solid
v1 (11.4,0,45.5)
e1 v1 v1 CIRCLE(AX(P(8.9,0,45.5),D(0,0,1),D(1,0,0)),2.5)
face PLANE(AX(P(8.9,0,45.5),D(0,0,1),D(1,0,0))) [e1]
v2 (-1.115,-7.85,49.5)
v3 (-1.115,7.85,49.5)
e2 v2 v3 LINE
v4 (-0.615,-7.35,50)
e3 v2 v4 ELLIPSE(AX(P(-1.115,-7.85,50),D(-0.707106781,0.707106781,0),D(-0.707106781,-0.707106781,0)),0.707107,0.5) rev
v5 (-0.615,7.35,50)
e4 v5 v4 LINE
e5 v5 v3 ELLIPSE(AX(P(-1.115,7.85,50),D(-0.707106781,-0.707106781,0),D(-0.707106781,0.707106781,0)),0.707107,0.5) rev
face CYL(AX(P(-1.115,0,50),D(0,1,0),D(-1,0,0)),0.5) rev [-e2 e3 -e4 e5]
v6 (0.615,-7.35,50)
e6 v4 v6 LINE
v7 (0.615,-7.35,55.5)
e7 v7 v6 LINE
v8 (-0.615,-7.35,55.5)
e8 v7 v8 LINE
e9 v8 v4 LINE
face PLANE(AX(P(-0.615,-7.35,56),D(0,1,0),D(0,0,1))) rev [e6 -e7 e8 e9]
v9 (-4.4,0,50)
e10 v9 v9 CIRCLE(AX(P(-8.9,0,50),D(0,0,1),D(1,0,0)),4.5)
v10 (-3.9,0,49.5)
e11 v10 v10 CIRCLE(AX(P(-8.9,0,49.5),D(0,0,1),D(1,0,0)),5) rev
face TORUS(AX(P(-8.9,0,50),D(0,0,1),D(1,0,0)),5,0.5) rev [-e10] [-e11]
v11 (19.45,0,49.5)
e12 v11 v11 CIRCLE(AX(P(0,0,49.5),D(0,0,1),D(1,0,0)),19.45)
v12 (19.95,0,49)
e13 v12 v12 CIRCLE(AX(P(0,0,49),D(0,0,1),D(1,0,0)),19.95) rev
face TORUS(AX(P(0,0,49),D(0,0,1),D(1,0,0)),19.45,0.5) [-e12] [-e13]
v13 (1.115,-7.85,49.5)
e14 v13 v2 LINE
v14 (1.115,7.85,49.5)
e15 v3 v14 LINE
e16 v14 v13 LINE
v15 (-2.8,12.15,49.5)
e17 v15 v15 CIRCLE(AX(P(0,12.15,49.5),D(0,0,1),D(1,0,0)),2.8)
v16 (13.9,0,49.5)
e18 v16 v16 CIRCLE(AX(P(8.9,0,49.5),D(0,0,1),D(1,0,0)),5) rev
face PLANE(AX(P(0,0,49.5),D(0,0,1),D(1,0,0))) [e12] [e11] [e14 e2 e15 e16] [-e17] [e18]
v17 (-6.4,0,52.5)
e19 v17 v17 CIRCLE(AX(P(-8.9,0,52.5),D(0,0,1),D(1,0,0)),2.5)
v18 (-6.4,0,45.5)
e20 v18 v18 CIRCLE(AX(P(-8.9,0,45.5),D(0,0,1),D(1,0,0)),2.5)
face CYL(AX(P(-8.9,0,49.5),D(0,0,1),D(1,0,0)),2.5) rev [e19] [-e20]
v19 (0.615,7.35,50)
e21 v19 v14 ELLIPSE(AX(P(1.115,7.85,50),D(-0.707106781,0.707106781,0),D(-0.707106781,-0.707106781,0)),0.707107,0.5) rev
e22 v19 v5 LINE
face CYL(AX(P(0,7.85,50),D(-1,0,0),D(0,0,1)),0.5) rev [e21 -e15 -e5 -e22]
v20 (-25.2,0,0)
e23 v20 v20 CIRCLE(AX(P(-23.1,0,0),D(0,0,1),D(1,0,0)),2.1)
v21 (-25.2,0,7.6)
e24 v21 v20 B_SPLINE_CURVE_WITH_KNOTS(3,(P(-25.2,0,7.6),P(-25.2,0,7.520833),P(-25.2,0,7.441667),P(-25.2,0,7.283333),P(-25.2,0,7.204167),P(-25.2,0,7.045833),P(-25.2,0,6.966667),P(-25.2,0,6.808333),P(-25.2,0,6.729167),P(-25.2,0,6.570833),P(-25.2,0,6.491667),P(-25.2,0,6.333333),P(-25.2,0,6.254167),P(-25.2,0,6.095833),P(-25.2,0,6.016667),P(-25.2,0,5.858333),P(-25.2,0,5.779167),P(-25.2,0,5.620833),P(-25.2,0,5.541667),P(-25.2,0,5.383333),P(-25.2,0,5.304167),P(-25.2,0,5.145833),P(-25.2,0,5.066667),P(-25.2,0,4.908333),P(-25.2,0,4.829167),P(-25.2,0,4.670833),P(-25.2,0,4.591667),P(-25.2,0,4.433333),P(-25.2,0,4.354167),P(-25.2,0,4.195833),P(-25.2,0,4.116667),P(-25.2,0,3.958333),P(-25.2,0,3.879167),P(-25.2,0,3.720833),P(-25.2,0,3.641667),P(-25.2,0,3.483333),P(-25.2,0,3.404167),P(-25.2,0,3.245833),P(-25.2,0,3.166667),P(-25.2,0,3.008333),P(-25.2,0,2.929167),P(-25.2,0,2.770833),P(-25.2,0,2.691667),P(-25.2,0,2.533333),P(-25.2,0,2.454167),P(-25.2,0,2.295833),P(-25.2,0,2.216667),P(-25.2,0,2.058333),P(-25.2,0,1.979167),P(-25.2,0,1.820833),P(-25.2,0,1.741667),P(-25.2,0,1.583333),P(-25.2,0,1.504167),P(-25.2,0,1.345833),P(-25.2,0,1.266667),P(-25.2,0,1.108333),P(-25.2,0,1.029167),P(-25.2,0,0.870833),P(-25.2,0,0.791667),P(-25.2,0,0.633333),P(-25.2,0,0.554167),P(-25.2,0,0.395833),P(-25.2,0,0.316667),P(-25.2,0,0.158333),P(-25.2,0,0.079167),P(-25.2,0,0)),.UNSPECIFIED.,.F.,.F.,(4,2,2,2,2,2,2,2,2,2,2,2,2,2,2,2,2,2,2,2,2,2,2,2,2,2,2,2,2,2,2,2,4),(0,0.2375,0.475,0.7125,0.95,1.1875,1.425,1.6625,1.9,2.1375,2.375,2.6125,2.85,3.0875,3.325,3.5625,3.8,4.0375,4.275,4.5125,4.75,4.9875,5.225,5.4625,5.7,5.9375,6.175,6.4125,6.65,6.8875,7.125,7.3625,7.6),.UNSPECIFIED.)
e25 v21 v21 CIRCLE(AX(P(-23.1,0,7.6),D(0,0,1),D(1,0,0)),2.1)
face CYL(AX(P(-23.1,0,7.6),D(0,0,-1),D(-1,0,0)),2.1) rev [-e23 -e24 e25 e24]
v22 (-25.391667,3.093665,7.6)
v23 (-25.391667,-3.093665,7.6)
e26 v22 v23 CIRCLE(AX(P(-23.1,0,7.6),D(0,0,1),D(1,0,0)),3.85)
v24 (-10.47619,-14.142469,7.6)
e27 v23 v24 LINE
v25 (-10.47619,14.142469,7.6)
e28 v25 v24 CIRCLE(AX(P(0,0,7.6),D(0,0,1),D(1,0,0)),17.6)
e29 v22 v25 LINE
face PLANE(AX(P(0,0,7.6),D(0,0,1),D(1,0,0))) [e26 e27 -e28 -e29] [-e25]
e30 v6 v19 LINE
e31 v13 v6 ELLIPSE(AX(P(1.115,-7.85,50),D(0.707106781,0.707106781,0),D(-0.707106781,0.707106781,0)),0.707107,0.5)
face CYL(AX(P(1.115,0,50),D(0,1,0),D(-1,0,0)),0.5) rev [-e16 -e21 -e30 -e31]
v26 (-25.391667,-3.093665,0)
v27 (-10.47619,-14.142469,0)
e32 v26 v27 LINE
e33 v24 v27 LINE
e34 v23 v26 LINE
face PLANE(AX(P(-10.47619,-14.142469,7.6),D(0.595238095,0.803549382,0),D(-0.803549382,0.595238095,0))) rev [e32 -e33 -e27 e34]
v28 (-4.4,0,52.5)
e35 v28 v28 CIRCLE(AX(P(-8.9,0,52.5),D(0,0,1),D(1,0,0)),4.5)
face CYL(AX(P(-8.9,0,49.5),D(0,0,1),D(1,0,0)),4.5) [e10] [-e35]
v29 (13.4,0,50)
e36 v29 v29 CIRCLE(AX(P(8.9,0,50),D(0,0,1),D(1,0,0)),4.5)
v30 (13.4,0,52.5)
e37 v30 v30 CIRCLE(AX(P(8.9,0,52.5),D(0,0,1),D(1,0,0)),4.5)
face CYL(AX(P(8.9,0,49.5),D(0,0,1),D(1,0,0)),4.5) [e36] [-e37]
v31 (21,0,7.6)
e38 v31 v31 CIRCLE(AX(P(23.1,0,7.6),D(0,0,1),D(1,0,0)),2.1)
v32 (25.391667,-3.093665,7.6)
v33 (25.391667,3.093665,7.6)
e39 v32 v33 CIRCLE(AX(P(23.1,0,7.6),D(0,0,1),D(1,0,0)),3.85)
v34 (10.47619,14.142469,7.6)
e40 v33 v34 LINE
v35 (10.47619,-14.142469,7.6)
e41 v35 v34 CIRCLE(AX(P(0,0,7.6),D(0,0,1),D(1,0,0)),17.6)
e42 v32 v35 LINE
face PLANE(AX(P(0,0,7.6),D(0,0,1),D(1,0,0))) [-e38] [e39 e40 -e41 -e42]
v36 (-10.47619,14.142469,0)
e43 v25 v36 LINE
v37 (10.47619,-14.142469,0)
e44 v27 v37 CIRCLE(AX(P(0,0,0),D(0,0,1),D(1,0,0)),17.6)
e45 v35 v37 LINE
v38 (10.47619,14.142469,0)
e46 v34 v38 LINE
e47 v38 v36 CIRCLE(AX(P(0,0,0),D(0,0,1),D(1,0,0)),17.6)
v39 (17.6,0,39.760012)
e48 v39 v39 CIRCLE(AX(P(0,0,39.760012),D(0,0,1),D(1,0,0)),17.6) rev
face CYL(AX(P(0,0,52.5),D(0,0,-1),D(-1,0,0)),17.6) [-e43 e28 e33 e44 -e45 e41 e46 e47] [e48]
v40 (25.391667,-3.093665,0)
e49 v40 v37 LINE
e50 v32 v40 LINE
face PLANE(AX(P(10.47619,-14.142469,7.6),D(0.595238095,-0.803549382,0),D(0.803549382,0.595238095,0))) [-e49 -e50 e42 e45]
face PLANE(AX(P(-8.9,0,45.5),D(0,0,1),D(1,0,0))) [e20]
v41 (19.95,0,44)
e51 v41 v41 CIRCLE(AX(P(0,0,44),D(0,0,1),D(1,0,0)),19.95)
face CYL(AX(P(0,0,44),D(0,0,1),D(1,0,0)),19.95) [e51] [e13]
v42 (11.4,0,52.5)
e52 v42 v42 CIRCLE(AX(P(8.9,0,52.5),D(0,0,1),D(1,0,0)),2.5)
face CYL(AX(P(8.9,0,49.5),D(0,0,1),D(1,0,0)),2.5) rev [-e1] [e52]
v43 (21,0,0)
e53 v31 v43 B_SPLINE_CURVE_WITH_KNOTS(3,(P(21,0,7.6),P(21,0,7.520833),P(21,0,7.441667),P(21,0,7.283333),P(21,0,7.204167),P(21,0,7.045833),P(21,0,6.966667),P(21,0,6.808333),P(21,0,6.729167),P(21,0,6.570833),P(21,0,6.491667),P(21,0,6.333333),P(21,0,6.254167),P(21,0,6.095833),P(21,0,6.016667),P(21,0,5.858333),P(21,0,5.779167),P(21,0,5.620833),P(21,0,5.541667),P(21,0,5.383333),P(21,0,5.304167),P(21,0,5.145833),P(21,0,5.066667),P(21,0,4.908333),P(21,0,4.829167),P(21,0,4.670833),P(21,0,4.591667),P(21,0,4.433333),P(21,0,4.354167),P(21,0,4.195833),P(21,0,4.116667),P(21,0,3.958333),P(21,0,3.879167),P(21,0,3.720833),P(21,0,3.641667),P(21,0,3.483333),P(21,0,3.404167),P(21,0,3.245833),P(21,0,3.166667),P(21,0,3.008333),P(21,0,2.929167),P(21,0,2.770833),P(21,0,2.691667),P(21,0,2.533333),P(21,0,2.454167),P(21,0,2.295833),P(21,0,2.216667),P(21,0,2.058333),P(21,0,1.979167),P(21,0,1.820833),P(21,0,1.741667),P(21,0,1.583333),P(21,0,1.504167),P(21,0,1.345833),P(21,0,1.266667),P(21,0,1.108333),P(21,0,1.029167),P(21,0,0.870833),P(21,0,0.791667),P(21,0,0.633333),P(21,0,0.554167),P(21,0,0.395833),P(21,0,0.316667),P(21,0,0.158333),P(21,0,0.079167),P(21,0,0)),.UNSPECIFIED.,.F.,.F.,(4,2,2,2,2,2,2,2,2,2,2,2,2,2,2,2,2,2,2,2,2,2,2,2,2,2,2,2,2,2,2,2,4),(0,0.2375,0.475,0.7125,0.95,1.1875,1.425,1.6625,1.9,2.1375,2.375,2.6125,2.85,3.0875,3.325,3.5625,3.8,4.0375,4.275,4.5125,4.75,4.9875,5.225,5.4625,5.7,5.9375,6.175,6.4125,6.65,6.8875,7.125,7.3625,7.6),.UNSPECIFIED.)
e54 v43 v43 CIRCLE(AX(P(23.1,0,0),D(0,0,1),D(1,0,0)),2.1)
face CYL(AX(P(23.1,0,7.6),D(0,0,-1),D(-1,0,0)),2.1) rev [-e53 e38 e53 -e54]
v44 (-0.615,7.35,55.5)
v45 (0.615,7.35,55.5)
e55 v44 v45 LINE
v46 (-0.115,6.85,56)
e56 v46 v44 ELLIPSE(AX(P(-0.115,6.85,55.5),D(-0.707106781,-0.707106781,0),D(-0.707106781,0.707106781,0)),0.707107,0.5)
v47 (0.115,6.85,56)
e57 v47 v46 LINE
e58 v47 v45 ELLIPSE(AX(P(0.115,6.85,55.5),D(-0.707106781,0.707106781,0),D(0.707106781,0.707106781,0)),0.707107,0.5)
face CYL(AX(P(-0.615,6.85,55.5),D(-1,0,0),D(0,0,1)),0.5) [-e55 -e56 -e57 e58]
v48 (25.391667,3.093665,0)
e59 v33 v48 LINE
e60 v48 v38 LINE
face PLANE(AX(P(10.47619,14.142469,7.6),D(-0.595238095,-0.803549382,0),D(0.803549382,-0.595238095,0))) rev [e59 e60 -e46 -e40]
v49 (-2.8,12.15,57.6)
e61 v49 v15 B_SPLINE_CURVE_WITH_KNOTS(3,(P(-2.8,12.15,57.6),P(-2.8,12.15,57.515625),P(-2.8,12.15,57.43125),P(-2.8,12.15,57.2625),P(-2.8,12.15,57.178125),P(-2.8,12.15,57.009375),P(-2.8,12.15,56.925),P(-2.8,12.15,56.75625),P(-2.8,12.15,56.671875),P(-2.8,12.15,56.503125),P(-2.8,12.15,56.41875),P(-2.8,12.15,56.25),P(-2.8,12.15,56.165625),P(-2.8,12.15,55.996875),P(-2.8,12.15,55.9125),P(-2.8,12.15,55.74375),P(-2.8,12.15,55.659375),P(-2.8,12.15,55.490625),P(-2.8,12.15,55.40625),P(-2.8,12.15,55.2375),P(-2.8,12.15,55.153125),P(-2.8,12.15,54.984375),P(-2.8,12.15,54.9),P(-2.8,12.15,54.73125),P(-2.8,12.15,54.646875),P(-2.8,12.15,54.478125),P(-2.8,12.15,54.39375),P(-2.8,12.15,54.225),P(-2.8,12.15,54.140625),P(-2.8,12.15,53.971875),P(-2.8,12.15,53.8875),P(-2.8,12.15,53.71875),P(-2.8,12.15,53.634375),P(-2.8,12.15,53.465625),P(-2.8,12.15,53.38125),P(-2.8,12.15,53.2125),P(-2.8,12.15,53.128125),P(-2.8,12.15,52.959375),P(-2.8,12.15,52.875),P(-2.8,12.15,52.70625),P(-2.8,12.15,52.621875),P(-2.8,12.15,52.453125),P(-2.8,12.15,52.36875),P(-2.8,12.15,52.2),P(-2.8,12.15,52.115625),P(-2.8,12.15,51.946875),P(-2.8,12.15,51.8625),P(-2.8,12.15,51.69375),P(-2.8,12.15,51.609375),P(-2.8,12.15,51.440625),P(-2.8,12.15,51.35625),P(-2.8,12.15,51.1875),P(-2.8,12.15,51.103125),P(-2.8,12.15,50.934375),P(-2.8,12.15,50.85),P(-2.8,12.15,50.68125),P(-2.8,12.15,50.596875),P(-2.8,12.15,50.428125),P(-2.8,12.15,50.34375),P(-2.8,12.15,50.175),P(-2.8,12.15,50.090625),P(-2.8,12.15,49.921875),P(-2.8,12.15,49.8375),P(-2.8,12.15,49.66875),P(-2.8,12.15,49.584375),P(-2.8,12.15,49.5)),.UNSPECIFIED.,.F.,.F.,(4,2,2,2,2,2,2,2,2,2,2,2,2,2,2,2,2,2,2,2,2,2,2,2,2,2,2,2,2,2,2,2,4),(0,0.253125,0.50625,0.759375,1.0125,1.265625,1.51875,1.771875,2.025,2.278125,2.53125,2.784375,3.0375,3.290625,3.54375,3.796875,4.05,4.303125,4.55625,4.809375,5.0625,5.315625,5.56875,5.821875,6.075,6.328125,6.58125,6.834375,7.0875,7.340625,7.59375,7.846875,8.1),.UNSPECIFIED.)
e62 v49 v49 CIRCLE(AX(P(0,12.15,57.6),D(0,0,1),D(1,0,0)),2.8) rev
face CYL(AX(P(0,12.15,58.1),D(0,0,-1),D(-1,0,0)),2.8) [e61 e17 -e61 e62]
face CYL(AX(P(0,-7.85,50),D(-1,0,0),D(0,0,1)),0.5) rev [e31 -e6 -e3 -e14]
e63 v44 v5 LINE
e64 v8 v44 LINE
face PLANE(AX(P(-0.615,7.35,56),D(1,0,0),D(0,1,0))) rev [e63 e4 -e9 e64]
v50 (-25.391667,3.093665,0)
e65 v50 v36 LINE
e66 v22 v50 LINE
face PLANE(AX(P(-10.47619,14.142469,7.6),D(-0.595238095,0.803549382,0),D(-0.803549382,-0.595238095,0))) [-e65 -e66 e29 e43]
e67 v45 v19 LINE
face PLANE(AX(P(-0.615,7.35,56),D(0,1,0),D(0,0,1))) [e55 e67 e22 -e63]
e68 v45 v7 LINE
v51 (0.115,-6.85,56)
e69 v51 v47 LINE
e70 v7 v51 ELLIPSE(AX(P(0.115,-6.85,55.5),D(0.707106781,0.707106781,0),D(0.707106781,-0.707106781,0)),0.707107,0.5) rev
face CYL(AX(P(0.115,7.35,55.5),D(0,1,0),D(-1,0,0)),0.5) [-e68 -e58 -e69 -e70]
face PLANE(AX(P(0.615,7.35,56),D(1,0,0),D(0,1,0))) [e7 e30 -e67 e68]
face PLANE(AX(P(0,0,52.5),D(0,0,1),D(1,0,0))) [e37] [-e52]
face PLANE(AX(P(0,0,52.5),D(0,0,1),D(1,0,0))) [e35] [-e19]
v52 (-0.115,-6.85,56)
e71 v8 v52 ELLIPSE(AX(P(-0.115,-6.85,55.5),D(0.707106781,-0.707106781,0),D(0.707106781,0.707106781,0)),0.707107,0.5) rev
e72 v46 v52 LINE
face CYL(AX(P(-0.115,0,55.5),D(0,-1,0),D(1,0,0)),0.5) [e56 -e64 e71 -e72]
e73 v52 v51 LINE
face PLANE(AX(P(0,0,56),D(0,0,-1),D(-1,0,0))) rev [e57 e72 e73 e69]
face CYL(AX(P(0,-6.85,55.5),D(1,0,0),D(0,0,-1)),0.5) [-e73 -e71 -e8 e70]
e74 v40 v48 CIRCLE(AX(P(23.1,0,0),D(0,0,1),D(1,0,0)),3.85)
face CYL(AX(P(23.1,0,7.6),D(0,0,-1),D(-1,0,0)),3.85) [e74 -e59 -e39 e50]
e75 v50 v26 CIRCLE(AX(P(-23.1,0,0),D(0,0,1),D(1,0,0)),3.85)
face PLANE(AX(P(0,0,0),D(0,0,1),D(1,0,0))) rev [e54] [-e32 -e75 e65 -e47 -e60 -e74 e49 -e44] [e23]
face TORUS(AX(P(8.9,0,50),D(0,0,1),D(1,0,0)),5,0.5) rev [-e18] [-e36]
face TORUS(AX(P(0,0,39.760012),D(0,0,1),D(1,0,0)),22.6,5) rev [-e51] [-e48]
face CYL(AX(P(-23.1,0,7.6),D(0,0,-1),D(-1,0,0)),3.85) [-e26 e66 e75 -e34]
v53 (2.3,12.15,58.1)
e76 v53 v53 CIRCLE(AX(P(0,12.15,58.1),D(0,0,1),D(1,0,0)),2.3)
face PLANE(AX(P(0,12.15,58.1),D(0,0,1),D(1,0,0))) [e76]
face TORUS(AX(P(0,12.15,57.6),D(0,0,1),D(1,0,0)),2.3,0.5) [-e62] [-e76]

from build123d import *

# Parameters (mm, degrees)
SKETCH2_R           = 17.6
BOSS_EXTRUDE1_DEPTH = 52.5
SKETCH3_R           = 2.1
BOSS_EXTRUDE2_DEPTH = 7.6
SKETCH4_W           = 1.23
SKETCH4_H           = 14.7
BOSS_EXTRUDE3_DEPTH = 3.5
CUT_EXTRUDE1_START  = -3
SKETCH5_R           = 17.6
SKETCH5_R_2         = 4.5
SKETCH5_W           = 1.23
SKETCH5_H           = 14.7
SKETCH5_R_3         = 2.5
CUT_EXTRUDE1_DEPTH  = 3
SKETCH7_R           = 19.95
BOSS_EXTRUDE5_DEPTH = 5.5
FILLET3_R           = 5
FILLET4_R           = 0.5
CUT_EXTRUDE2_START  = -7
SKETCH8_R           = 2.5
CUT_EXTRUDE2_DEPTH  = 7
SKETCH10_R          = 2.8
BOSS_EXTRUDE6_DEPTH = 8.6
FILLET5_R           = 0.5


with BuildPart() as part:
    # Sketch2 → Boss-Extrude1 (new body)
    with BuildSketch(Plane.XY):
        Circle(SKETCH2_R)
    extrude(amount=BOSS_EXTRUDE1_DEPTH)

    # Sketch3 → Boss-Extrude2 (add)
    # profile 1 of 2: a face of its own
    with BuildSketch(Plane.XY):
        with BuildLine():
            Line((-10.476190476, 14.14246913), (-25.391666667, 3.093665122))
            ThreePointArc((-25.391666667, 3.093665122), (-26.95, 0), (-25.391666667, -3.093665122))
            Line((-25.391666667, -3.093665122), (-10.476190476, -14.14246913))
            ThreePointArc((-10.476190476, -14.14246913), (-17.6, 0), (-10.476190476, 14.14246913))
        make_face()
        with Locations(Location((-23.1, 0, 0), (0, 0, 180))):
            Circle(SKETCH3_R, mode=Mode.SUBTRACT)
    # profile 2 of 2: a face of its own
    with BuildSketch(Plane.XY):
        with BuildLine():
            Line((25.391666667, 3.093665122), (10.476190476, 14.14246913))
            ThreePointArc((10.476190476, 14.14246913), (17.6, 0), (10.476190476, -14.14246913))
            Line((10.476190476, -14.14246913), (25.391666667, -3.093665122))
            ThreePointArc((25.391666667, -3.093665122), (26.95, 0), (25.391666667, 3.093665122))
        make_face()
        with Locations(Location((23.1, 0, 0), (0, 0, 180))):
            Circle(SKETCH3_R, mode=Mode.SUBTRACT)
    extrude(amount=BOSS_EXTRUDE2_DEPTH)

    # Sketch4 → Boss-Extrude3 (add)
    with BuildSketch(Plane.XY.offset(52.5)):
        Rectangle(SKETCH4_W, SKETCH4_H)
    extrude(amount=BOSS_EXTRUDE3_DEPTH)

    # Sketch5 → Cut-Extrude1 (cut)
    # profile 1 of 3: a face of its own
    with BuildSketch(Plane.XY.offset(52.5).offset(CUT_EXTRUDE1_START)):
        with Locations(Location((0, 0, 0), (0, 0, 126.52960723))):
            Circle(SKETCH5_R)
        with Locations((-8.9, 0)):
            Circle(SKETCH5_R_2, mode=Mode.SUBTRACT)
        with Locations((8.9, 0)):
            Circle(SKETCH5_R_2, mode=Mode.SUBTRACT)
        Rectangle(SKETCH5_W, SKETCH5_H, mode=Mode.SUBTRACT)
    # profile 2 of 3: a face of its own
    with BuildSketch(Plane.XY.offset(52.5).offset(CUT_EXTRUDE1_START)):
        with Locations((-8.9, 0)):
            Circle(SKETCH5_R_3)
    # profile 3 of 3: a face of its own
    with BuildSketch(Plane.XY.offset(52.5).offset(CUT_EXTRUDE1_START)):
        with Locations((8.9, 0)):
            Circle(SKETCH5_R_3)
    extrude(amount=CUT_EXTRUDE1_DEPTH, mode=Mode.SUBTRACT)

    # Sketch7 → Boss-Extrude5 (add)
    with BuildSketch(Plane.XY.offset(49.5)):
        Circle(SKETCH7_R)
    extrude(amount=-BOSS_EXTRUDE5_DEPTH)

    # Fillet3
    # the kernel refuses this fillet: 5 mm, written as the material it adds along each edge
    with BuildSketch(Plane(origin=(0, 0, 44), x_dir=(1, 0, 0), z_dir=(0, 1, 0))) as fillet3_piece_1:
        with BuildLine():
            CenterArc((22.6, 4.239988208), FILLET3_R, 180, 57.994545172)
            Line((19.95, 0), (19.897, -0.084799764))
            ThreePointArc((19.897, -0.084799764), (18.775, -0.1), (17.6, -0.1))
            Line((17.6, -0.1), (17.5, 0))
            Line((17.5, 0), (17.5, 4.239988208))
            Line((17.5, 4.239988208), (17.6, 4.239988208))
        make_face()
    revolve(axis=Axis((0, 0, 44), (0, 0, -1)))

    # Fillet4
    fillet4_edges = [part.edges().sort_by_distance(p)[0] for p in [
        (0.615, 0, 56),
        (0, 7.35, 56),
        (0, -7.35, 56),
        (-0.615, 0, 56),
        (0, 7.35, 49.5),
        (-0.615, 0, 49.5),
        (0, -7.35, 49.5),
        (0.615, 0, 49.5),
        (-13.4, 0, 49.5),
        (4.4, 0, 49.5),
        (-19.95, 0, 49.5),
    ]]
    fillet(fillet4_edges, radius=FILLET4_R)

    # Sketch8 → Cut-Extrude2 (cut)
    with BuildSketch(Plane.XY.offset(52.5).offset(CUT_EXTRUDE2_START)):
        with Locations((8.9, 0)):
            Circle(SKETCH8_R)
        with Locations((-8.9, 0)):
            Circle(SKETCH8_R)
    extrude(amount=CUT_EXTRUDE2_DEPTH, mode=Mode.SUBTRACT)

    # Sketch10 → Boss-Extrude6 (add)
    with BuildSketch(Plane.XY.offset(49.5)):
        with Locations(Location((0, 12.15, 0), (0, 0, 180))):
            Circle(SKETCH10_R)
    extrude(amount=BOSS_EXTRUDE6_DEPTH)

    # Fillet5
    fillet5_edges = [part.edges().sort_by_distance(p)[0] for p in [
        (2.8, 12.15, 58.1),
    ]]
    fillet(fillet5_edges, radius=FILLET5_R)


solid = part.part
